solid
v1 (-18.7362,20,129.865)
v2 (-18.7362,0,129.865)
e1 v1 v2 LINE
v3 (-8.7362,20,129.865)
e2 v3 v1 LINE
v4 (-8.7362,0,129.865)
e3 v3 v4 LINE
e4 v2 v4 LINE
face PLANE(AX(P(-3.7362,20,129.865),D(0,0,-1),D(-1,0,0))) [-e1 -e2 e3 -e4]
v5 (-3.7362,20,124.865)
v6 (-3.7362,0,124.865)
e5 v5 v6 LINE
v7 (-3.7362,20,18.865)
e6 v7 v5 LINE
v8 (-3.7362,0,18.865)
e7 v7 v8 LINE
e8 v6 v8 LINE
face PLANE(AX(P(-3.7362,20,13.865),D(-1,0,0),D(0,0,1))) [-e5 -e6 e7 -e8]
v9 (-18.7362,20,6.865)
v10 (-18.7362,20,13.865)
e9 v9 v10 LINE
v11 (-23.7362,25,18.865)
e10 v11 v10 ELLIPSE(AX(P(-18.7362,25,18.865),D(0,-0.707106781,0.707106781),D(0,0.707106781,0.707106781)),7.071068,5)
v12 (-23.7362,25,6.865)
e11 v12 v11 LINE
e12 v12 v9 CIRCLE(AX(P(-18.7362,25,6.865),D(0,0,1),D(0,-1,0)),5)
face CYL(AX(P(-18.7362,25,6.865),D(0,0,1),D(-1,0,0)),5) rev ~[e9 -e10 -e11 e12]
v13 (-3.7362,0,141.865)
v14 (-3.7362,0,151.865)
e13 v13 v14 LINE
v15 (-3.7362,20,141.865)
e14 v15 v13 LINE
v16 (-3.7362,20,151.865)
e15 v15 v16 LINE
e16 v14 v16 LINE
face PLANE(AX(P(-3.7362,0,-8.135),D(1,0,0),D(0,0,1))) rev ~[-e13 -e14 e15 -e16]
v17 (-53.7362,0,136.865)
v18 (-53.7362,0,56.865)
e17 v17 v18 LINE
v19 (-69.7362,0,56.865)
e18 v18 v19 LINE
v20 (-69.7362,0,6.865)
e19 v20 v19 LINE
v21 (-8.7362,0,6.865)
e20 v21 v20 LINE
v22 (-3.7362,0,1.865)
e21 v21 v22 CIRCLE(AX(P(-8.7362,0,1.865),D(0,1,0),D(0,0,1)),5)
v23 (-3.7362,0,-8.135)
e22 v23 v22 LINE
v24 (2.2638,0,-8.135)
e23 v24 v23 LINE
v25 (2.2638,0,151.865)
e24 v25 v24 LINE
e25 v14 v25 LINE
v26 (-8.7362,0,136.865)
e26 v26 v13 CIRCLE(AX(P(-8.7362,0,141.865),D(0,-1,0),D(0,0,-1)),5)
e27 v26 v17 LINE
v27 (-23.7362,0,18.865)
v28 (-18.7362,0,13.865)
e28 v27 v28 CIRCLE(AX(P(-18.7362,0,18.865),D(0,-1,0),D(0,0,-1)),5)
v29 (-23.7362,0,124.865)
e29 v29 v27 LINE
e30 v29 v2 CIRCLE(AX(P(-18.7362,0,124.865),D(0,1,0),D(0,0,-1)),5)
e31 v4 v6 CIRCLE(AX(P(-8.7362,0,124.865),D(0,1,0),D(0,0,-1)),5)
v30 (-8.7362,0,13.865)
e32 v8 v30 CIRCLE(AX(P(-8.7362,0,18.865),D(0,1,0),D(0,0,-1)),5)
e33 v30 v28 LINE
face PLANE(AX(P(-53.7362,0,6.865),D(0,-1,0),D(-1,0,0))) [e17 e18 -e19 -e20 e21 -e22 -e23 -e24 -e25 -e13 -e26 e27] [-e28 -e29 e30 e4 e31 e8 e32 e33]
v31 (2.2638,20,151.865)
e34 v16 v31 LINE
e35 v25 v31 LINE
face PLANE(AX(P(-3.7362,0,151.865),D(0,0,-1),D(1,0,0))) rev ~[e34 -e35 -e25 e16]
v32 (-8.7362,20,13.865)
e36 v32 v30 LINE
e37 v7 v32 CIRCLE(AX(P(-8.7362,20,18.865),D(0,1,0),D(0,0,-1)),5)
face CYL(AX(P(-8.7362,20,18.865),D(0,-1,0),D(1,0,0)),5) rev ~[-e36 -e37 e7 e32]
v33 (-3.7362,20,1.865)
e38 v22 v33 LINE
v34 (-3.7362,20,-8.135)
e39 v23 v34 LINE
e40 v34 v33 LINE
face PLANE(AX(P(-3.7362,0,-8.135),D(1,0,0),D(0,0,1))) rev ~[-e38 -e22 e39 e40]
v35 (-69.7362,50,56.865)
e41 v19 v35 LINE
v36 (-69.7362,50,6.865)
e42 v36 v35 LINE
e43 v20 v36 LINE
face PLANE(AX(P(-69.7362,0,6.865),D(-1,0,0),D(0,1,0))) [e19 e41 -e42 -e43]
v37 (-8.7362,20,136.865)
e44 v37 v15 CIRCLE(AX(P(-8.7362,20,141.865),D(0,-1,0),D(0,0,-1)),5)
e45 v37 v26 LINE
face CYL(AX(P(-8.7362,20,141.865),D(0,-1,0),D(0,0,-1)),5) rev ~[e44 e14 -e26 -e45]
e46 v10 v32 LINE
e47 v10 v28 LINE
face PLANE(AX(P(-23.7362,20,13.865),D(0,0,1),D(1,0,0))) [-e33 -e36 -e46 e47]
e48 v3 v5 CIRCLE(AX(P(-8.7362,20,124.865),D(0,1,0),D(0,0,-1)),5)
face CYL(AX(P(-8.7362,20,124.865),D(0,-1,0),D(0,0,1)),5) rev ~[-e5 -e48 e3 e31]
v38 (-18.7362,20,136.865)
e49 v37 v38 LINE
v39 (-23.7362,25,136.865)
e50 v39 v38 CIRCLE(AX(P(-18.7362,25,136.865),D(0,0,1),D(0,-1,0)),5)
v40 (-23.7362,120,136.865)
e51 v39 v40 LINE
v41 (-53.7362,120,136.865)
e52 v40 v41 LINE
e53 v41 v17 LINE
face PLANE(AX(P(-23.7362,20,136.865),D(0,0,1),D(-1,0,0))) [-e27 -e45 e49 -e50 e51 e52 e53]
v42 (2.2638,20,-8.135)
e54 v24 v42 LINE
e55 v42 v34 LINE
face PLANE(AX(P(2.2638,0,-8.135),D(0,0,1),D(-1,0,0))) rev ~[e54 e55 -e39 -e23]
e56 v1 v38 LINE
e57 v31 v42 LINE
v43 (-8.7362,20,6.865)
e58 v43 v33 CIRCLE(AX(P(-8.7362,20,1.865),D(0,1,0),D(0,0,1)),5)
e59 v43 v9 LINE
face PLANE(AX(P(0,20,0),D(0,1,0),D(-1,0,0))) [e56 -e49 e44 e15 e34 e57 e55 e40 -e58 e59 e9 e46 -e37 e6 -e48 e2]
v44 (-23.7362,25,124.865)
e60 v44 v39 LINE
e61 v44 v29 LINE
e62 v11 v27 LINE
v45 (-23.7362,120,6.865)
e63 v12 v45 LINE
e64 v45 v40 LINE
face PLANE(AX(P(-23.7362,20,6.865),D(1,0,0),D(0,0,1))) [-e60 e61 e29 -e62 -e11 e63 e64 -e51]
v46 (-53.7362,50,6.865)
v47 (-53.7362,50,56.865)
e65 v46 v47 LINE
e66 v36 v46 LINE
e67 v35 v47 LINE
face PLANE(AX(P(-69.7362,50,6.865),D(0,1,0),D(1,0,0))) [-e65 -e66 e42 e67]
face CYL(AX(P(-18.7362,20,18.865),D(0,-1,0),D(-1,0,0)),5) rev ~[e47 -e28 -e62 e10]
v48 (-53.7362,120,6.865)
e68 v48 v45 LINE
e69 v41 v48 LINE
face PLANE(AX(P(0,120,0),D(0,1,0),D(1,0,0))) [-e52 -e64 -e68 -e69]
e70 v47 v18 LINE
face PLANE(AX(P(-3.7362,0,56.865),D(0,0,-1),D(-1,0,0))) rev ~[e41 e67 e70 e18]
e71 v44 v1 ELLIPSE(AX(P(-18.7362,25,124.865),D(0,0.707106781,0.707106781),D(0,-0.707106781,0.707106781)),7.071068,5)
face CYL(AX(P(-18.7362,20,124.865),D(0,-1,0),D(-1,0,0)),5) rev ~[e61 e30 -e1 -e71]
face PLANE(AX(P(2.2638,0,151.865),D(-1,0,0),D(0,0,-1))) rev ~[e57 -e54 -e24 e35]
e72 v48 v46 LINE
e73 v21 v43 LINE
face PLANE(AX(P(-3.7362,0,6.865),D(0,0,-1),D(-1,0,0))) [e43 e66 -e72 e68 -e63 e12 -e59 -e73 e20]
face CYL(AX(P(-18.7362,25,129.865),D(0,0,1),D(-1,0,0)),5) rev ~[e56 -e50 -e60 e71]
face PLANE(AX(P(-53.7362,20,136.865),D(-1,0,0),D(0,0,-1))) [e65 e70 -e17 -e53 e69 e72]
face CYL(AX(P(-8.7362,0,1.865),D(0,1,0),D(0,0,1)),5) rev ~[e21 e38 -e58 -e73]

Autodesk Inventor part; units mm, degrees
ref_plane "YZ Plane" through (0, 0, 0) normal (1, 0, 0) x (0, 1, 0)
ref_plane "XZ Plane" through (0, 0, 0) normal (0, 1, 0) x (-1, 0, 0)
ref_plane "XY Plane" through (0, 0, 0) normal (0, 0, 1) x (1, 0, 0)
sketch "Sketch1" plane through (0, 0, 0) normal (0, 1, 0) x (-1, 0, 0)
  line L0 (3.7362, 151.865) -> (-2.2638, 151.865)
  line L1 (-2.2638, 151.865) -> (-2.2638, -8.135)
  line L2 (-2.2638, -8.135) -> (3.7362, -8.135)
  line L3 (3.7362, -8.135) -> (3.7362, 151.865)
  point P0 (0, 0)
  dimension "d0" = 6
  dimension "d1" = 160
extrude "Extrusion1" add sketch "Sketch1" along normal blind 20
sketch "Sketch2" plane through (-3.7362, 0, -8.135) normal (-1, 0, 0) x (0, 0, 1)
  line L0 (160, 20) -> (0, 20) projected
  line L1 (15, 20) -> (145, 20)
  line L2 (145, 20) -> (145, 0)
  line L3 (145, 0) -> (15, 0)
  line L4 (15, 0) -> (15, 20)
  line L5 (0, 0) -> (0, 20) projected
  line L6 (160, 0) -> (160, 20) projected
  point P0 (8.135, 0)
  dimension "d4" = 15
  dimension "d5" = 15
  dimension "d6" = 20
extrude "Extrusion2" add sketch "Sketch2" along normal blind 50
sketch "Sketch3" plane through (0, 20, 0) normal (0, 1, 0) x (1, 0, 0)
  line L0 (-3.7362, -136.865) -> (-53.7362, -136.865) projected
  line L1 (-53.7362, -6.865) -> (-23.7362, -6.865)
  line L2 (-23.7362, -6.865) -> (-23.7362, -136.865)
  line L3 (-23.7362, -136.865) -> (-53.7362, -136.865)
  line L4 (-53.7362, -136.865) -> (-53.7362, -6.865)
  point P0 (0, 0)
  dimension "d9" = 30
extrude "Extrusion3" add sketch "Sketch3" along normal blind 100
sketch "Sketch4" plane through (-3.7362, 0, 6.865) normal (0, 0, -1) x (-1, 0, 0)
  line L0 (50, 0) -> (66, 0)
  line L1 (66, 0) -> (66, 50)
  line L2 (66, 50) -> (50, 50)
  line L3 (50, 50) -> (50, 0)
  point P0 (-3.7362, 0)
  dimension "d12" = 16
  dimension "d13" = 50
extrude "Extrusion4" add sketch "Sketch4" against normal blind 50
sketch "Sketch6" plane through (0, 20, 0) normal (0, 1, 0) x (1, 0, 0)
  line L0 (-23.7362, -6.865) -> (-23.7362, -136.865) projected
  line L1 (-3.7362, -129.865) -> (-23.7362, -129.865)
  line L2 (-23.7362, -129.865) -> (-23.7362, -13.865)
  line L3 (-23.7362, -13.865) -> (-3.7362, -13.865)
  line L4 (-3.7362, -13.865) -> (-3.7362, -129.865)
  line L5 (-3.7362, -136.865) -> (-23.7362, -136.865) projected
  line L6 (2.2638, -151.865) -> (2.2638, 8.135) projected
  line L7 (-3.7362, -6.865) -> (-23.7362, -6.865) projected
  point P0 (0, 0)
  dimension "d16" = 7
  dimension "d17" = 6
  dimension "d18" = 7
extrude "Extrusion5" cut sketch "Sketch6" against normal blind 50
fillet "Fillet1" radius 5 4 edges at (-23.7362, 20, 133.365) (-23.7362, 20, 10.365) (-23.7362, 10, 129.865) (-23.7362, 10, 13.865)
fillet "Fillet2" radius 5 4 edges at (-3.7362, 10, 129.865) (-3.7362, 10, 13.865) (-3.7362, 10, 6.865) (-3.7362, 10, 136.865)
properties part number "E_box"
